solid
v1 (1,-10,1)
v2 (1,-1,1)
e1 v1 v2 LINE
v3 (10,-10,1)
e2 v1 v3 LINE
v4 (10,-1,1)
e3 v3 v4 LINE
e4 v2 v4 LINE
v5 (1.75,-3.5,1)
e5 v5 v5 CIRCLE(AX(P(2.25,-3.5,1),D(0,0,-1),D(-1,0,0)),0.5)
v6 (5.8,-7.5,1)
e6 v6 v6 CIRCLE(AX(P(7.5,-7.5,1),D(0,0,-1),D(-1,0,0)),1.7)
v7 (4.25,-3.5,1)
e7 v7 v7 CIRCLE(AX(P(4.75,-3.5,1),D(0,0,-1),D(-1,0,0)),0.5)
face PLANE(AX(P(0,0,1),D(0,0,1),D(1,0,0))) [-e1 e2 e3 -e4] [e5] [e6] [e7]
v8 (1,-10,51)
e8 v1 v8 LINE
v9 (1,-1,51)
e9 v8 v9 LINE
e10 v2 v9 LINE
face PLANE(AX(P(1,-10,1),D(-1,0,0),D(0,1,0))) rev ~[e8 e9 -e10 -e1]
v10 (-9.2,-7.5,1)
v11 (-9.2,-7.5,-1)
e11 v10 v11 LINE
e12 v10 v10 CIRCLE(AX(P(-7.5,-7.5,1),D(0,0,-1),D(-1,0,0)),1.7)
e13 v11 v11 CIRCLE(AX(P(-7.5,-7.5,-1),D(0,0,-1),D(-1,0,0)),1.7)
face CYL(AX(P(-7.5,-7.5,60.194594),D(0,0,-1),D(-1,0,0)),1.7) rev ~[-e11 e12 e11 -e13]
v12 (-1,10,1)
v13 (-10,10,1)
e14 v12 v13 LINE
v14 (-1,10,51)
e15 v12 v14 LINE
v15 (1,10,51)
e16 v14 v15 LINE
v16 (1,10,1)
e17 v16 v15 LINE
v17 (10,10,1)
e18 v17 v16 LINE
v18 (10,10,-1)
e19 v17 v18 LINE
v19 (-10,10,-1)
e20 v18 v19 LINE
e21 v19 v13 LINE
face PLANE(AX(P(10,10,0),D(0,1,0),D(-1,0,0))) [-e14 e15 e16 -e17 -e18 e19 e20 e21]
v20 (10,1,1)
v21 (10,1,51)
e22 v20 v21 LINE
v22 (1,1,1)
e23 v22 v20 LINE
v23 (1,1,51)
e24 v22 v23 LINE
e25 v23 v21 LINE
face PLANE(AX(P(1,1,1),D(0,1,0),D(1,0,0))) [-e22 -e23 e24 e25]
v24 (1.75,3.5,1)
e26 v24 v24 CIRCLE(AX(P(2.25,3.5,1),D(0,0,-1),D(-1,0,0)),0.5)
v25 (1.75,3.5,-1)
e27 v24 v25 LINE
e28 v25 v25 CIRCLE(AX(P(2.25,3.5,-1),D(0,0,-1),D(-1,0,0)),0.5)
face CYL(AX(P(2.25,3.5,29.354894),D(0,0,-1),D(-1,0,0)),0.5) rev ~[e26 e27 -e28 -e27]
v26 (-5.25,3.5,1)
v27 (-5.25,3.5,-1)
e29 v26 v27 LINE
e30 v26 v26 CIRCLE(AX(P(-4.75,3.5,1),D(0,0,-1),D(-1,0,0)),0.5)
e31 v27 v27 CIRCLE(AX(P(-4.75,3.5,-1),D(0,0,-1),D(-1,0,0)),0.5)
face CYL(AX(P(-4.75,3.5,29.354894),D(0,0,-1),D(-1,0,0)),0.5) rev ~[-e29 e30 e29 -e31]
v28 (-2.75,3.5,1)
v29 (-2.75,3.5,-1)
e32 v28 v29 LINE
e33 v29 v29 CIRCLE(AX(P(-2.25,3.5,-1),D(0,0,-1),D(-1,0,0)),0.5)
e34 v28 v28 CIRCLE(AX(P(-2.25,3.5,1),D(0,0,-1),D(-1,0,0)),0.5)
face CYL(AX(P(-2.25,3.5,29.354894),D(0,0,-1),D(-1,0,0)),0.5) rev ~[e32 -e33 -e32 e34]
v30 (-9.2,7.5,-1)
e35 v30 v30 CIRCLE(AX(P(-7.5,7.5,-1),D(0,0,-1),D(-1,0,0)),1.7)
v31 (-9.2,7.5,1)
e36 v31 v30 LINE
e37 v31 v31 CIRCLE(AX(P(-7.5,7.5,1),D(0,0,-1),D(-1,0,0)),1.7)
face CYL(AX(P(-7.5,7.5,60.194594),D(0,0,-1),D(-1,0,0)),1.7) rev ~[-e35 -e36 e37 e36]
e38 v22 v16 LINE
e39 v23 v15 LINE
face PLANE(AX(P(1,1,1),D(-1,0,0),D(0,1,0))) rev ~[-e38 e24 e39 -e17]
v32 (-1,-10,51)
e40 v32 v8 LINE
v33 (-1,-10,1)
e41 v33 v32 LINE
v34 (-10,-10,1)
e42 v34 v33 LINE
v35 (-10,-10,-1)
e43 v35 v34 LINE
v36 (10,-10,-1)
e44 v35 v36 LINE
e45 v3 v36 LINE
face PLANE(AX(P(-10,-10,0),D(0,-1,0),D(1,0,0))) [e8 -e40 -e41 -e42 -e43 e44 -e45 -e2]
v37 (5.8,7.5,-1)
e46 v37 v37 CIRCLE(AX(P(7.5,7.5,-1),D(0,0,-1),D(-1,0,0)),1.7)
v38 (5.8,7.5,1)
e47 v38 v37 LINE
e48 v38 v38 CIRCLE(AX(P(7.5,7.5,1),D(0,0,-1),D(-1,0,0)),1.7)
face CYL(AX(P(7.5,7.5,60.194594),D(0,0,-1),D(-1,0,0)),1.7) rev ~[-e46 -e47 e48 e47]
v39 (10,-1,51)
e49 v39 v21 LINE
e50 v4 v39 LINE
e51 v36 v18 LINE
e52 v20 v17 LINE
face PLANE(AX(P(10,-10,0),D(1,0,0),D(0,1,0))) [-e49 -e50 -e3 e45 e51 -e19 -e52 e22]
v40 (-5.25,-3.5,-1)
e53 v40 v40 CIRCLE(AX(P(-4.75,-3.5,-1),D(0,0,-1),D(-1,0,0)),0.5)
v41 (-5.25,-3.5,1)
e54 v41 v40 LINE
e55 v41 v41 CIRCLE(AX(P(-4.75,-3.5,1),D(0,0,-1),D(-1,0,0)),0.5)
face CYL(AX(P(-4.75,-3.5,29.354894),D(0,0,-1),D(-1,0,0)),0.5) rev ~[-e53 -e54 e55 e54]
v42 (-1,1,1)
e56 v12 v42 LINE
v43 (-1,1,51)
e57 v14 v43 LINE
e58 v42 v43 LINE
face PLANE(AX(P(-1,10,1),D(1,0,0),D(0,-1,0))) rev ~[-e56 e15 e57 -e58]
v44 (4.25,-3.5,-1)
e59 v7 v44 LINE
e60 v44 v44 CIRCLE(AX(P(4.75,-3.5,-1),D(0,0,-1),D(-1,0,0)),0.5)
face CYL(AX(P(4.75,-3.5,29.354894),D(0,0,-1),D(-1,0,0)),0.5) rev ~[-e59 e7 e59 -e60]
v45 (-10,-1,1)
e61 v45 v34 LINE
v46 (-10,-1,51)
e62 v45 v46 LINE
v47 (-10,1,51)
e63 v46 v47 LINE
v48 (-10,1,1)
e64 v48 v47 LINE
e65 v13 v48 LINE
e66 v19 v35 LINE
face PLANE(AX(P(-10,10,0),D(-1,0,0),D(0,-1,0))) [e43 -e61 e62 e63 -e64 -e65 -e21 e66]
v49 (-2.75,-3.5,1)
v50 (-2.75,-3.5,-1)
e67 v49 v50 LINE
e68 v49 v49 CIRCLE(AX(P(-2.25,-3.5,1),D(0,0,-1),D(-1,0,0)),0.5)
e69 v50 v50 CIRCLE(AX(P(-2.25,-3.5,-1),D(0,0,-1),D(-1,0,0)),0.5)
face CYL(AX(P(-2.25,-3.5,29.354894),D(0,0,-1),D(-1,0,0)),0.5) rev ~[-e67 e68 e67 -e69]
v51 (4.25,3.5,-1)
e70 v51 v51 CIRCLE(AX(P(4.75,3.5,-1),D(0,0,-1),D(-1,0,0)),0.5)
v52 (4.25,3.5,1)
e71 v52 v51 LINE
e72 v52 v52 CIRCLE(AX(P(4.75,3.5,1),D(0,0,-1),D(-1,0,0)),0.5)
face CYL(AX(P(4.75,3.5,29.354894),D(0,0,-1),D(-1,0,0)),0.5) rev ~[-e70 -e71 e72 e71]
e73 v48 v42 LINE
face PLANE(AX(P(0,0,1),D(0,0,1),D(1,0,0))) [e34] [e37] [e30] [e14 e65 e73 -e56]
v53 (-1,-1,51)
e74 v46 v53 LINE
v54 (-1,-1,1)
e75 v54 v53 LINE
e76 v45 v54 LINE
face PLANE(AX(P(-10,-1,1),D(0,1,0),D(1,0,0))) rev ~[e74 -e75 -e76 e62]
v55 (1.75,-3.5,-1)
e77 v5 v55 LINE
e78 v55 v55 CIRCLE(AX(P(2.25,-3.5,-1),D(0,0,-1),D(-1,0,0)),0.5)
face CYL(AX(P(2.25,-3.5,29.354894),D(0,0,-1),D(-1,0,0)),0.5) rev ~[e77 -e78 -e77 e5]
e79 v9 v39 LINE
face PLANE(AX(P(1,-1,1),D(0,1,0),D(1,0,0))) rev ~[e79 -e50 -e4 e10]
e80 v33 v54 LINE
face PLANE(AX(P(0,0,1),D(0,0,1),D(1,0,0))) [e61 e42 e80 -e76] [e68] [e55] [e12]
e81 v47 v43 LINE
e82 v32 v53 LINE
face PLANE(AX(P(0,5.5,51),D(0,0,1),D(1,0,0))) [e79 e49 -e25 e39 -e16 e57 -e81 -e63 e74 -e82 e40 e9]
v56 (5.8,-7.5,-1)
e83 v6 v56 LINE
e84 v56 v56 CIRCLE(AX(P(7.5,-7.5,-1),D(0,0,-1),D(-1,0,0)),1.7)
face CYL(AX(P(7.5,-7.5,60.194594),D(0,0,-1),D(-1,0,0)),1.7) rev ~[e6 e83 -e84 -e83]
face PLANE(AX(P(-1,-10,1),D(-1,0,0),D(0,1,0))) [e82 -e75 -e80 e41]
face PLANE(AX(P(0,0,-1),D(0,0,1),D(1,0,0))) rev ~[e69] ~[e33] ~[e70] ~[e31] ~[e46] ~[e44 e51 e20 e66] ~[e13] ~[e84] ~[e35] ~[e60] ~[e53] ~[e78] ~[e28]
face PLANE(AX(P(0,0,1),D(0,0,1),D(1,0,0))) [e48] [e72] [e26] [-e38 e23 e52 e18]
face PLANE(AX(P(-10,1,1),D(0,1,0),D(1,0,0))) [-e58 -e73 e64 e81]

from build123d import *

# Parameters (mm, degrees)
F1_DEPTH = 1
F3_D     = 1
F4_W     = 2
F4_H     = 9
F4_H_2   = 2
F4_W_2   = 9
F5_DEPTH = 50
F6_D     = 3.4


# Not quite as in the source:
# - a feature names something its author has since deleted; it is built from what else it names


with BuildPart() as f1:
    # F0 (on Top) → F1 (new body, symmetric)
    with BuildSketch(Plane.XY):
        Polygon((10, 1), (10, 10), (1, 10), (-1, 10), (-10, 10), (-10, 1), (-10, -1), (-10, -10), (-1, -10), (1, -10), (10, -10), (10, -1), align=None)
    extrude(amount=F1_DEPTH, both=True)

    # F3 (through all)
    with Locations(Plane.XY.offset(1)):
        with Locations((-4.75, 3.5), (-2.25, 3.5), (-4.75, -3.5), (-2.25, -3.5), (2.25, 3.5), (4.75, 3.5), (4.75, -3.5), (2.25, -3.5)):
            Hole(F3_D / 2)

    # F4 (on face) → F5 (join)
    with BuildSketch(Plane.XY.offset(1)):
        with Locations((0, 5.5)):
            Rectangle(F4_W, F4_H)
        Rectangle(F4_W, F4_H_2)
        with Locations((-5.5, 0)):
            Rectangle(F4_W_2, F4_H_2)
        with Locations((5.5, 0)):
            Rectangle(F4_W_2, F4_H_2)
        with Locations((0, -5.5)):
            Rectangle(F4_W, F4_H)
    extrude(amount=F5_DEPTH)

    # F6 (through all)
    with Locations(Plane.XY.offset(1)):
        with Locations((-7.5, 7.5), (7.5, 7.5), (7.5, -7.5), (-7.5, -7.5)):
            Hole(F6_D / 2)


solid = f1.part
